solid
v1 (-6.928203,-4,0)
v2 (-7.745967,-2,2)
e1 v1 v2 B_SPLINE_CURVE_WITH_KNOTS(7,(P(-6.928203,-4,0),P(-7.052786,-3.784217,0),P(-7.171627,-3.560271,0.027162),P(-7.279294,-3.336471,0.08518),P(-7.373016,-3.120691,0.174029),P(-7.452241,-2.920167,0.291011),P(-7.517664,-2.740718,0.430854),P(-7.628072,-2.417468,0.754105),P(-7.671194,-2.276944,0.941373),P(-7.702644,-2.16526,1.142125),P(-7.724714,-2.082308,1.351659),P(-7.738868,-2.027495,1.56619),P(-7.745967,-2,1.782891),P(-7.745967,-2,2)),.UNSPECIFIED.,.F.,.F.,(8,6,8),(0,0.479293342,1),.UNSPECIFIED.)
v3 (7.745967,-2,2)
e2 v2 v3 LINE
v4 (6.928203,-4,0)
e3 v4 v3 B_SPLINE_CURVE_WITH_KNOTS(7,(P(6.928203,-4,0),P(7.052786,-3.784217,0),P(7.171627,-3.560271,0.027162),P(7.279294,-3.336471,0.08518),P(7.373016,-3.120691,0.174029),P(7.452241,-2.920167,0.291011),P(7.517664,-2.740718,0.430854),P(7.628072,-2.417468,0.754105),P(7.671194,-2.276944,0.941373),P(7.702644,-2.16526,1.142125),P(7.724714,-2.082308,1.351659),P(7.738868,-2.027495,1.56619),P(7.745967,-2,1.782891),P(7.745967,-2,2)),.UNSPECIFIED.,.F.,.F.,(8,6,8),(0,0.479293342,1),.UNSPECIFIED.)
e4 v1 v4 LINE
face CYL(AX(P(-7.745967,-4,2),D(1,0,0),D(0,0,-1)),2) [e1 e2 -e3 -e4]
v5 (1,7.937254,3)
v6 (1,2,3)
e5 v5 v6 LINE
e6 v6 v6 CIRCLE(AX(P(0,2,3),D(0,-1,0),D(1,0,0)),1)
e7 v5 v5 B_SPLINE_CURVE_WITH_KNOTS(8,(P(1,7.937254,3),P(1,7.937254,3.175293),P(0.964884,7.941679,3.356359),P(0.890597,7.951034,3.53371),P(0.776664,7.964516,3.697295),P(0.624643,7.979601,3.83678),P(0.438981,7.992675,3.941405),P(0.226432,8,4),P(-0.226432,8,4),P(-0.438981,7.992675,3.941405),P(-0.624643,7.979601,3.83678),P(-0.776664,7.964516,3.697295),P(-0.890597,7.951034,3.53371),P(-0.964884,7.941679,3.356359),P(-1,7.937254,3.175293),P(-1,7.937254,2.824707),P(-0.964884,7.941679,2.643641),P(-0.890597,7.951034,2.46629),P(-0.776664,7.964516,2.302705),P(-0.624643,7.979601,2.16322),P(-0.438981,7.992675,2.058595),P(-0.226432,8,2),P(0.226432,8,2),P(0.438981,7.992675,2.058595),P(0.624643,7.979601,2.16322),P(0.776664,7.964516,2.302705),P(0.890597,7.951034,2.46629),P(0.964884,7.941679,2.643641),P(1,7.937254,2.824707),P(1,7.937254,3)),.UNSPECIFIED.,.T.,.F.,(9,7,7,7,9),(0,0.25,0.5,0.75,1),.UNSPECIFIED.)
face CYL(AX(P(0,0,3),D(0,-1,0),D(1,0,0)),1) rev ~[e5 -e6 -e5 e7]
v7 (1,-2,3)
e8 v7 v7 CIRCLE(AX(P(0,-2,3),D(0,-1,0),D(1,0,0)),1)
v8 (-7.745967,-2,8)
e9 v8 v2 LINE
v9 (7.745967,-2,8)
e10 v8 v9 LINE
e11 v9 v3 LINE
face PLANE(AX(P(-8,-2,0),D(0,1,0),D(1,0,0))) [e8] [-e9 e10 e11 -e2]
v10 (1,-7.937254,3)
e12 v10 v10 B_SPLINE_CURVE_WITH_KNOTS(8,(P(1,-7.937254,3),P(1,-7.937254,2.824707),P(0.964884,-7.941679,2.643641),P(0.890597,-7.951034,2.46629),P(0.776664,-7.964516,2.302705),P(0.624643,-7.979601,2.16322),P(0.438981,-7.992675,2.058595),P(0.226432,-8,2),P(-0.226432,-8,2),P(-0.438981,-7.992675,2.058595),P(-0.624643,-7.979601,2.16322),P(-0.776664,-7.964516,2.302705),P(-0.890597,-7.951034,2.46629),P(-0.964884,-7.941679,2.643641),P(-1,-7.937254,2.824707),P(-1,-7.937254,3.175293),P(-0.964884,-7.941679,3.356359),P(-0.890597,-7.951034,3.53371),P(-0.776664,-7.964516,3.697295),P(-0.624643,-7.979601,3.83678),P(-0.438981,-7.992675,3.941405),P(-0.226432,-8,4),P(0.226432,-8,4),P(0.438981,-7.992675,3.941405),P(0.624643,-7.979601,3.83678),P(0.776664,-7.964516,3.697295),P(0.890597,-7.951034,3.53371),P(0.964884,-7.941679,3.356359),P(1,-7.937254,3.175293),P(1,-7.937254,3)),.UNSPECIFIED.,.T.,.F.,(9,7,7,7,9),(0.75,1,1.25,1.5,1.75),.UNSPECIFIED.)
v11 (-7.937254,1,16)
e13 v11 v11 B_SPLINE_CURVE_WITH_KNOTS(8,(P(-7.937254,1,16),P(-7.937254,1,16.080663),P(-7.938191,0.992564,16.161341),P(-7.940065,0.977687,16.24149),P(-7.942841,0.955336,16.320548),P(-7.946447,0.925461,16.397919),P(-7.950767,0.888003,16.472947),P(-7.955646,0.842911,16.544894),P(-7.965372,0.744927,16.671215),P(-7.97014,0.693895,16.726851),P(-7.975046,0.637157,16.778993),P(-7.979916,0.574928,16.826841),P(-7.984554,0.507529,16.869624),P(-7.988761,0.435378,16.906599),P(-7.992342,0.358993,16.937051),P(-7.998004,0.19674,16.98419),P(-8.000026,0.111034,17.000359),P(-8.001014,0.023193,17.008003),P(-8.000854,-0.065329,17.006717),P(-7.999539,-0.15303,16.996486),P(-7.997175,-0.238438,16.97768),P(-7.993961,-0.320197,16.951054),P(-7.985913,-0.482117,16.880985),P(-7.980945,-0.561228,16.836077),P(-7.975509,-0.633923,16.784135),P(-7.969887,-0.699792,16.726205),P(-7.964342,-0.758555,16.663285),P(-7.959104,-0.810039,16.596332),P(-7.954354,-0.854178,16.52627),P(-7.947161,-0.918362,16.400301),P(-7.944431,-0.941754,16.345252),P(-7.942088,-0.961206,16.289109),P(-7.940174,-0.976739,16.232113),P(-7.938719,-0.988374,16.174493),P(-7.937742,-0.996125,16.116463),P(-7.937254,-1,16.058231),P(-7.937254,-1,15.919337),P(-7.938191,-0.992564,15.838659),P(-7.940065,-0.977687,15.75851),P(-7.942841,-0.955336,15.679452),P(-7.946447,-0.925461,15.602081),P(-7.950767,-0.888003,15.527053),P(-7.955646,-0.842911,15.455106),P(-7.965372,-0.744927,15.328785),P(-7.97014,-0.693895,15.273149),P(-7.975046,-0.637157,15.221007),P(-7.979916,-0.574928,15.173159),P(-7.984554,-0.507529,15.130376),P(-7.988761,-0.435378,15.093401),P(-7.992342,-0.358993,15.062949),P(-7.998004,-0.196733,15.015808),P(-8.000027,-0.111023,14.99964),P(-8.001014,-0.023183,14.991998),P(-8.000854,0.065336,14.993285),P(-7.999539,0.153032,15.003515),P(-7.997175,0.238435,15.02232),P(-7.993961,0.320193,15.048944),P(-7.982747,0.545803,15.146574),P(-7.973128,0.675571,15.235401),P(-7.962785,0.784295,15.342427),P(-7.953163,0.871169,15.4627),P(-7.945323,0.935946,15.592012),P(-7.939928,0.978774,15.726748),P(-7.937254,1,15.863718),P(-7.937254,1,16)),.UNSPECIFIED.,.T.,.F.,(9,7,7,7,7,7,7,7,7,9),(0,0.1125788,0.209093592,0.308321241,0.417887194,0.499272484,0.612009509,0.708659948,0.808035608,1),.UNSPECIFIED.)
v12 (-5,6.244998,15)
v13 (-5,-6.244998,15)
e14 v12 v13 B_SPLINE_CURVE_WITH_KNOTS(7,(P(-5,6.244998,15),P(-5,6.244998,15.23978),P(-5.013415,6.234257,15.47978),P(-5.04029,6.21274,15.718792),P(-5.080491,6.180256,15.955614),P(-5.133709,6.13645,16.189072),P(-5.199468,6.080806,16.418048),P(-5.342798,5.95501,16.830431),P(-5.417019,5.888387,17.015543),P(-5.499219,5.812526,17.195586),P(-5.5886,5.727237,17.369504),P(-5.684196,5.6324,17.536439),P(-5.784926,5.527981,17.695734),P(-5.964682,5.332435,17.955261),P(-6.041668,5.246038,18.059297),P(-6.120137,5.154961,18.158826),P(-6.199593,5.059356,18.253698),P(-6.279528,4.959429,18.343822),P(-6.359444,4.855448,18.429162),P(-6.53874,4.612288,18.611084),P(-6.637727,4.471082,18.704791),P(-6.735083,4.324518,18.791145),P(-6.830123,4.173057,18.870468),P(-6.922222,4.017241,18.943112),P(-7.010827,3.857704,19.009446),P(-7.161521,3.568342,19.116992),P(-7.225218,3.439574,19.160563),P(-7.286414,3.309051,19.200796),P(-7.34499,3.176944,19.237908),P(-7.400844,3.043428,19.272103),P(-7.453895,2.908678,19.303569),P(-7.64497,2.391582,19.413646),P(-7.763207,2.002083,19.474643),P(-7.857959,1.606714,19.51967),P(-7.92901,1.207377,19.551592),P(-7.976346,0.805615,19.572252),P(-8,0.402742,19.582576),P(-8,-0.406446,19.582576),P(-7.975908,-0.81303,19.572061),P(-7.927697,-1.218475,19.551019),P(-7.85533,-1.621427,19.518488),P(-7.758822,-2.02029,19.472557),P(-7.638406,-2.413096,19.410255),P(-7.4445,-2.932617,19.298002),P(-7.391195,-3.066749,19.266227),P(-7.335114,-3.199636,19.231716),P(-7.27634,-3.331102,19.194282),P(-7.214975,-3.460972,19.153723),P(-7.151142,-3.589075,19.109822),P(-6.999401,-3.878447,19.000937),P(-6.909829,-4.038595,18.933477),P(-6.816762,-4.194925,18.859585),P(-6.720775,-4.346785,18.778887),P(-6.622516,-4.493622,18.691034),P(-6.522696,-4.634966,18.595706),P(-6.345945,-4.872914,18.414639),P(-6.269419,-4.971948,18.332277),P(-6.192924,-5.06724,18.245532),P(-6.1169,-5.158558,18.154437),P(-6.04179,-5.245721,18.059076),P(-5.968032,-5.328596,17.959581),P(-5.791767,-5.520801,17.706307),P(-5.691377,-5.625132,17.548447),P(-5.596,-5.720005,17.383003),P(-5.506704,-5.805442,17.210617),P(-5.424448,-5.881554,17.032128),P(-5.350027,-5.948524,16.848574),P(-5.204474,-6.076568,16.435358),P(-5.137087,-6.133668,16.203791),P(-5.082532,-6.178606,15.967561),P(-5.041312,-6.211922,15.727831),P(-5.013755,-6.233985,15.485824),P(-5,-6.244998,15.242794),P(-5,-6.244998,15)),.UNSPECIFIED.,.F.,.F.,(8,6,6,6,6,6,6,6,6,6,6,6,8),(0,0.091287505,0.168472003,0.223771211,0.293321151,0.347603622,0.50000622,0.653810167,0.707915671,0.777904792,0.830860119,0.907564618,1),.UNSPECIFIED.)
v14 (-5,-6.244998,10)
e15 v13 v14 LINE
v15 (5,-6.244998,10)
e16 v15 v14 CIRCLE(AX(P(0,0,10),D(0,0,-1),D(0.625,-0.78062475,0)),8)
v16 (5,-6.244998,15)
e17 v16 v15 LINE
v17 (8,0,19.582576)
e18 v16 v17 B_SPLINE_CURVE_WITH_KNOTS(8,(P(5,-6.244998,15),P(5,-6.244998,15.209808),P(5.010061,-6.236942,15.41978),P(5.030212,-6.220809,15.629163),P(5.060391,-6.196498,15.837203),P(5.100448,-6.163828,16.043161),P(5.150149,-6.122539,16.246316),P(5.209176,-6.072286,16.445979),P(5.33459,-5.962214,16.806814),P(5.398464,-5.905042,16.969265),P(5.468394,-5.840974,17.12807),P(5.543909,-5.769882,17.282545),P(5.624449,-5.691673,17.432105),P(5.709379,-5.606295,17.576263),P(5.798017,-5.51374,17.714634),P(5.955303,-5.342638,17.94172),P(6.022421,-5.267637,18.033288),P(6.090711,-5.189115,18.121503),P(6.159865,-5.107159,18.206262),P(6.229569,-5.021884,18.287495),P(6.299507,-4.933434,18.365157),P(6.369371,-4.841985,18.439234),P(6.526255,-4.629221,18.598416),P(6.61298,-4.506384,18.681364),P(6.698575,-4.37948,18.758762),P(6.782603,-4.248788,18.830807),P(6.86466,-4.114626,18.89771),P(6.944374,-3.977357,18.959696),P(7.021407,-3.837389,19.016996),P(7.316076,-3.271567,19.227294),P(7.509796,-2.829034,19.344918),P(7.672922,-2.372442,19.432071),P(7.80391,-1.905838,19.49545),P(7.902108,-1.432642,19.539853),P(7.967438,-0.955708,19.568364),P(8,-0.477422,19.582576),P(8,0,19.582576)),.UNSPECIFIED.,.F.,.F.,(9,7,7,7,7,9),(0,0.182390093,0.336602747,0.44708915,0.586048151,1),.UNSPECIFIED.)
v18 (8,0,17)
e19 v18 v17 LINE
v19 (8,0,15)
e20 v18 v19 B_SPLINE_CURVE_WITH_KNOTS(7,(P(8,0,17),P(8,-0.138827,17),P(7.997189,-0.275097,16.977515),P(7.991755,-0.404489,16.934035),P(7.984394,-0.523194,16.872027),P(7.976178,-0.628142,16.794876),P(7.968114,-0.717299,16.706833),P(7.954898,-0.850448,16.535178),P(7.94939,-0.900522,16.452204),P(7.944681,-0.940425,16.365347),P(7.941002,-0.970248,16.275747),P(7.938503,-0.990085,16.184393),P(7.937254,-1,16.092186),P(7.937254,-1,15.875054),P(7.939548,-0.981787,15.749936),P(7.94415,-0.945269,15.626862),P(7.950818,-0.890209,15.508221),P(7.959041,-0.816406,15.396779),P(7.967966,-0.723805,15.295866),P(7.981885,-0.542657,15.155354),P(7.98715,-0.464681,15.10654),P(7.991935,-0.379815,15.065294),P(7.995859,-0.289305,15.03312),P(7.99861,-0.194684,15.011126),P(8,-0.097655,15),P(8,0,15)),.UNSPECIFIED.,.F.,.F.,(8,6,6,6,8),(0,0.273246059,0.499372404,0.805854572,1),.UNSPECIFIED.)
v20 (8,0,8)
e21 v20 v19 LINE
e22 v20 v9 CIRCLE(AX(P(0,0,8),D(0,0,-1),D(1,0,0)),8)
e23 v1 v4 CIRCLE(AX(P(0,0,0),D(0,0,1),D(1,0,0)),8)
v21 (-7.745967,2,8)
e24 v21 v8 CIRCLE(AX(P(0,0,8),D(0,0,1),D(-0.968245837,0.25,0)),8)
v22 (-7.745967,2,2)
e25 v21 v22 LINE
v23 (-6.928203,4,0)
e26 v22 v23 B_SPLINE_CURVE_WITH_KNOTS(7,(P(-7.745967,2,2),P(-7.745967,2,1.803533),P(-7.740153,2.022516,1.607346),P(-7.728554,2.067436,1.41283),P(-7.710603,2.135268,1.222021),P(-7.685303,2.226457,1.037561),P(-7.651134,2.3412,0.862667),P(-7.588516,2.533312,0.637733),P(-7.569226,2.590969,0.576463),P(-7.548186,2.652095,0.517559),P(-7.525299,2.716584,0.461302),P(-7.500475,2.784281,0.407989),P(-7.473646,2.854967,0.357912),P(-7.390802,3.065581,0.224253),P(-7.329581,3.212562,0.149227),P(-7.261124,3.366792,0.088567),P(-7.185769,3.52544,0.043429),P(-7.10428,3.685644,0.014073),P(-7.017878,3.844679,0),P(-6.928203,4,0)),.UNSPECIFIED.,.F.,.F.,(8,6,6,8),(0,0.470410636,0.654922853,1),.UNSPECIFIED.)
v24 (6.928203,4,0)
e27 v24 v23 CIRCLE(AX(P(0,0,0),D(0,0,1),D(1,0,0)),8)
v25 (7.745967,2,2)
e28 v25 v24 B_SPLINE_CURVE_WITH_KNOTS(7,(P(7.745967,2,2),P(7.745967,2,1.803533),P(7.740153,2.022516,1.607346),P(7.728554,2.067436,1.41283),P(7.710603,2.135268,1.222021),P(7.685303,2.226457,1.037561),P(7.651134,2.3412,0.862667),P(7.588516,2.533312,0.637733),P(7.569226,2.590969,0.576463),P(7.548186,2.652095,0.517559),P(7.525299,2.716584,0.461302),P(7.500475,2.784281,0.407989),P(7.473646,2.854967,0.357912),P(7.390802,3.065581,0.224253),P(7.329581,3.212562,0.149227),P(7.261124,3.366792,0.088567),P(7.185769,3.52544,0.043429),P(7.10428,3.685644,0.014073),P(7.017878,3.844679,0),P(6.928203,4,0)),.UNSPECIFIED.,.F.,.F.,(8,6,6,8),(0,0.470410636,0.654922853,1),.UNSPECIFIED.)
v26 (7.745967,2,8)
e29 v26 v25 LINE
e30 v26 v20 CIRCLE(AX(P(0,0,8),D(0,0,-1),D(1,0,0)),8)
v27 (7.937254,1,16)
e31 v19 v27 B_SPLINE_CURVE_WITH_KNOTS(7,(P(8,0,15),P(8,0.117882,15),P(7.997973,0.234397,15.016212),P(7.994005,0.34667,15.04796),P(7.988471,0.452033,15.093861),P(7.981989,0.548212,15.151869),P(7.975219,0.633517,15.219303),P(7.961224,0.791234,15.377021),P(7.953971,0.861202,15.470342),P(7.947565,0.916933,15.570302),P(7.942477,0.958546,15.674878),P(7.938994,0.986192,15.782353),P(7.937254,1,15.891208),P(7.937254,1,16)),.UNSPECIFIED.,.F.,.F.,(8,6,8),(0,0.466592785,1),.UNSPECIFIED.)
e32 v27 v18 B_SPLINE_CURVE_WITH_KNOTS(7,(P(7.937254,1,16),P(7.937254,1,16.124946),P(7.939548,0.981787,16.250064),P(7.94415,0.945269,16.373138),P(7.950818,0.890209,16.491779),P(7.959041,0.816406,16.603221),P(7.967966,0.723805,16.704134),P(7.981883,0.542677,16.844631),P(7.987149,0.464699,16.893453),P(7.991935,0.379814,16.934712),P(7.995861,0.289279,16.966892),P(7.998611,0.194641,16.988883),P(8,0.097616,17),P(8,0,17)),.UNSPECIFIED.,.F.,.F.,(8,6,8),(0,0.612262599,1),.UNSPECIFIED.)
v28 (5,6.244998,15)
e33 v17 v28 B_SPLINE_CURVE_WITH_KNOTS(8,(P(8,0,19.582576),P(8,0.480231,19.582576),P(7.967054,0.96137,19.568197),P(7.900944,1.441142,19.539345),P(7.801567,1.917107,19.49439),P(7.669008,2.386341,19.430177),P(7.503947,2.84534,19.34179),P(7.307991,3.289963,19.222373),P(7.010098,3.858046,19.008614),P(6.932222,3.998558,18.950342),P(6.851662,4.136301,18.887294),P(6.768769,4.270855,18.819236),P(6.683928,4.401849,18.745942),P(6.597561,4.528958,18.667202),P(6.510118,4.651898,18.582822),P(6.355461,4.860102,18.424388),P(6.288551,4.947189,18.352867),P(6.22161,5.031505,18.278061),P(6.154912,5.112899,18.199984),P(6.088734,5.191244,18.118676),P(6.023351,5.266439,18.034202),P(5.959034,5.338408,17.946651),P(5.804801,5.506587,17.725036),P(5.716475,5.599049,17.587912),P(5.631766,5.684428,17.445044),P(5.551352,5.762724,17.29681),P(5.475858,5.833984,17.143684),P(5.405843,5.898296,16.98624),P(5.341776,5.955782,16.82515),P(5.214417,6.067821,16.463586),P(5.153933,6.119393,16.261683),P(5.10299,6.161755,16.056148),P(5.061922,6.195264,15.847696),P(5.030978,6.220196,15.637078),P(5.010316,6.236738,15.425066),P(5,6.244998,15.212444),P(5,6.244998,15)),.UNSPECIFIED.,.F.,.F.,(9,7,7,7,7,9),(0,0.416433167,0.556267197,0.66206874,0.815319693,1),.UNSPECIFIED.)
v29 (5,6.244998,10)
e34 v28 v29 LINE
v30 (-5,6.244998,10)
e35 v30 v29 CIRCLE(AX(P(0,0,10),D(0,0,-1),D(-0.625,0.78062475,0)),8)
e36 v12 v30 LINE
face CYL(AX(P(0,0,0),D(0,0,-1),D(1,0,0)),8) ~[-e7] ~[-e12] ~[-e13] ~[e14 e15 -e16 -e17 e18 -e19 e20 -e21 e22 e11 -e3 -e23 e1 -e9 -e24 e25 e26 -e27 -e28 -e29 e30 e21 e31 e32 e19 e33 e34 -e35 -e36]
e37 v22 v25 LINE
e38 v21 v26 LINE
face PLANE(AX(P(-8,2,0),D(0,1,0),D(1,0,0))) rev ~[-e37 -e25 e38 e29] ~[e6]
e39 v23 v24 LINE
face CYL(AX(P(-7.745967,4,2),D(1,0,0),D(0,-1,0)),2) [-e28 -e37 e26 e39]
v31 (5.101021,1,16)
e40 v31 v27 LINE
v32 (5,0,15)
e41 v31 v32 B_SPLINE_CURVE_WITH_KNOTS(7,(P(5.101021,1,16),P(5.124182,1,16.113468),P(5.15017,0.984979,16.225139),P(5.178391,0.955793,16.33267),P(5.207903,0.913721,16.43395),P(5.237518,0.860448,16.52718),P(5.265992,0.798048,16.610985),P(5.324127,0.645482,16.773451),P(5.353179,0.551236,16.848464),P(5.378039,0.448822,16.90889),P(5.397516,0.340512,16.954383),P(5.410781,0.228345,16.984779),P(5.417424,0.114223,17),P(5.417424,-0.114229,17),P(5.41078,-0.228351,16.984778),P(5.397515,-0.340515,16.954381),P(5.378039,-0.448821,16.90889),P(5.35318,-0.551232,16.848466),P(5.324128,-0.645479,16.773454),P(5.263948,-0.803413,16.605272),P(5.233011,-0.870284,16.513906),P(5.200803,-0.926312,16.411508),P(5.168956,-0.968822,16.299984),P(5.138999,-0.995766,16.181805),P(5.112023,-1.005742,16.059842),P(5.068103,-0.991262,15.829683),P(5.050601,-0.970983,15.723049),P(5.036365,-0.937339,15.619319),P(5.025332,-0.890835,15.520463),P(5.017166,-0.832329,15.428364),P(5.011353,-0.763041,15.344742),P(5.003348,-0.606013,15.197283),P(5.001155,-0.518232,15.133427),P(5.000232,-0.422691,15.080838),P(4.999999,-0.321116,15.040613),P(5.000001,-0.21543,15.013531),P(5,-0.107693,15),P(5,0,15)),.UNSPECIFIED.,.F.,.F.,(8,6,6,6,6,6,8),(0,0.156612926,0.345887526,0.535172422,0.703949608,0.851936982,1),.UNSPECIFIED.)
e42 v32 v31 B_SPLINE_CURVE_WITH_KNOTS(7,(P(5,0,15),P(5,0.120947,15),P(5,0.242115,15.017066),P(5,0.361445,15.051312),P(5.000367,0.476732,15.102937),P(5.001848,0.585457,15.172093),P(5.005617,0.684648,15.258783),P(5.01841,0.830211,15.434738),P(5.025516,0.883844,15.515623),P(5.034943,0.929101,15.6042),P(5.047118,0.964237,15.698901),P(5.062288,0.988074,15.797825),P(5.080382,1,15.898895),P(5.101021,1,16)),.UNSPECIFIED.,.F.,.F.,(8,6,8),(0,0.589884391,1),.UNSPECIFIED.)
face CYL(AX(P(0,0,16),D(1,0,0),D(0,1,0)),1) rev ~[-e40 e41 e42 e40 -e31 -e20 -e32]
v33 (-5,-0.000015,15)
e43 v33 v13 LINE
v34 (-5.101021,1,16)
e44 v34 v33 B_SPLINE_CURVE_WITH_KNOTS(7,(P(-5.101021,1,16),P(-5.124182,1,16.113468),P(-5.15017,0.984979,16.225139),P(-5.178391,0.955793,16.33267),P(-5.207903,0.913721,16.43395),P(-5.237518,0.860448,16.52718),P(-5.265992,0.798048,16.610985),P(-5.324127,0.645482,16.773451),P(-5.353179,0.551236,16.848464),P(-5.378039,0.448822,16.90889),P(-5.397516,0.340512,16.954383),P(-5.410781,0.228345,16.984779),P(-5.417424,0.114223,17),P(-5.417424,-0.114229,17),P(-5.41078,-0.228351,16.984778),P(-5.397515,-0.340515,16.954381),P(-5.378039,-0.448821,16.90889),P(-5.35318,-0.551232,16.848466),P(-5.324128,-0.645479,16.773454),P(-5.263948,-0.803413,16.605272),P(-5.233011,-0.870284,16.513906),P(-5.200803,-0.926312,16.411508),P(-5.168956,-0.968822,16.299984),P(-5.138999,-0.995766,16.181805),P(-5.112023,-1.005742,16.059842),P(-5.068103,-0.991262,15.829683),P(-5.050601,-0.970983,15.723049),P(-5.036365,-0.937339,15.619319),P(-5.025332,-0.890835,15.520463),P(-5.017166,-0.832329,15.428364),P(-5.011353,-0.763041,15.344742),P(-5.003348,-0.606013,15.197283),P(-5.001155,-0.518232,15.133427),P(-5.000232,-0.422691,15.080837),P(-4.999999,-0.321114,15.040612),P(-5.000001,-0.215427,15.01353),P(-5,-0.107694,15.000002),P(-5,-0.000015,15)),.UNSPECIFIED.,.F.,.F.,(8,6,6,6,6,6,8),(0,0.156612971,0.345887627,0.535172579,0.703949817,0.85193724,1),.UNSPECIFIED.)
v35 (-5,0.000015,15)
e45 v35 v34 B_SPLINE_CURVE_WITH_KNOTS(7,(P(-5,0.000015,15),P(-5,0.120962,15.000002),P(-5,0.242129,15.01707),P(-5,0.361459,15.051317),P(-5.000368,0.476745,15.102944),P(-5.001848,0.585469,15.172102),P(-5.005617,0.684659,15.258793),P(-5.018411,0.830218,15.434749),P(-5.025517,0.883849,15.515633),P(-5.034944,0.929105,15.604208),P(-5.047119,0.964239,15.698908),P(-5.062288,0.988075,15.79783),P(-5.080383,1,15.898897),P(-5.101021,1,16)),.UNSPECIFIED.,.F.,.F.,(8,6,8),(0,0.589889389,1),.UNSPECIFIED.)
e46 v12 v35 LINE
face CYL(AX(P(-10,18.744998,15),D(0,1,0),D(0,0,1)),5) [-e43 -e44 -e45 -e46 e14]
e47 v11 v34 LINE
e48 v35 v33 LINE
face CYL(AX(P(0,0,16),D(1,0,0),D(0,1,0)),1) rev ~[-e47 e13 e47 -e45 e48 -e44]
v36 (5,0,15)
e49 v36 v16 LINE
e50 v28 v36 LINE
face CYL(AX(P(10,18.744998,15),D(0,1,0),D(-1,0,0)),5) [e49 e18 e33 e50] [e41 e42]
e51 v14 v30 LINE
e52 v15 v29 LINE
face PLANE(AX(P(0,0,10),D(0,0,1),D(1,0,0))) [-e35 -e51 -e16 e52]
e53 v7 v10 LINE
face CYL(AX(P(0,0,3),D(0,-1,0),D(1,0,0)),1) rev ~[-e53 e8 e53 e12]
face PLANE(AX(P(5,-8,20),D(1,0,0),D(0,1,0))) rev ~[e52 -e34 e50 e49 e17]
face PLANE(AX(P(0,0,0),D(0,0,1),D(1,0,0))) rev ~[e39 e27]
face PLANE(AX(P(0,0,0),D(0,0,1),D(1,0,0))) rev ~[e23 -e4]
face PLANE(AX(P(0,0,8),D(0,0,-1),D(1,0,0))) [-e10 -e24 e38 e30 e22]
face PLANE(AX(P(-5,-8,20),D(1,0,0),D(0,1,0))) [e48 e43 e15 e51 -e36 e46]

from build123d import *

# Parameters (mm, degrees)
F0_R         = 8
F1_DEPTH     = 20
F2_W         = 10
F2_H         = 16
F3_DEPTH     = 10
F4_W         = 16
F4_H         = 4
F5_DEPTH     = 8
F6_R         = 1
F7_DEPTH     = 8
F8_R         = 1
F9_DEPTH     = 8
F10_T1_DEPTH = 37.4899959968
F11_R        = 2


# Not quite as in the source:
# - a fillet or chamfer that OpenCascade refuses, or shapes differently, is made with other operations: its cross-section is extruded or revolved along the edge and cut away or added


with BuildPart() as f1:
    # F0 (on Top) → F1 (new body)
    with BuildSketch(Plane.XY):
        Circle(F0_R)
    extrude(amount=F1_DEPTH)

    # F2 (on face) → F3 (cut)
    with BuildSketch(Plane.XY.offset(20)):
        Rectangle(F2_W, F2_H)
    extrude(amount=-F3_DEPTH, mode=Mode.SUBTRACT)

    # F4 (on face) → F5 (cut)
    with BuildSketch(Plane(origin=(0, 0, 0), x_dir=(1, 0, 0), z_dir=(0, 0, -1))):
        Rectangle(F4_W, F4_H)
    extrude(amount=-F5_DEPTH, mode=Mode.SUBTRACT)

    # F6 (on Right) → F7 (cut, symmetric)
    with BuildSketch(Plane.YZ):
        with Locations((0, 16)):
            Circle(F6_R)
    extrude(amount=F7_DEPTH, both=True, mode=Mode.SUBTRACT)

    # F8 (on Front) → F9 (cut, symmetric)
    with BuildSketch(Plane.XZ):
        with Locations((0, 3)):
            Circle(F8_R)
    extrude(amount=F9_DEPTH, both=True, mode=Mode.SUBTRACT)

    # F10: fillet of radius 5 on 2 edges, made by hand

    # F10_s2 → F10_t1 (cut)
    with BuildSketch(Plane.XZ.offset(-18.7449979984)):
        with BuildLine():
            ThreePointArc((-10, 20), (-6.4644660941, 18.5355339059), (-5, 15))
            Line((-5, 15), (-5, 20))
            Line((-5, 20), (-10, 20))
        make_face()
        with BuildLine():
            ThreePointArc((5, 15), (6.4644660941, 18.5355339059), (10, 20))
            Line((10, 20), (5, 20))
            Line((5, 20), (5, 15))
        make_face()
    extrude(amount=F10_T1_DEPTH, mode=Mode.SUBTRACT)

    # F11
    f11_edges = [f1.edges().sort_by_distance(p)[0] for p in [
        (0, -2, 0),
        (0, 2, 0),
    ]]
    fillet(f11_edges, radius=F11_R)


solid = f1.part
